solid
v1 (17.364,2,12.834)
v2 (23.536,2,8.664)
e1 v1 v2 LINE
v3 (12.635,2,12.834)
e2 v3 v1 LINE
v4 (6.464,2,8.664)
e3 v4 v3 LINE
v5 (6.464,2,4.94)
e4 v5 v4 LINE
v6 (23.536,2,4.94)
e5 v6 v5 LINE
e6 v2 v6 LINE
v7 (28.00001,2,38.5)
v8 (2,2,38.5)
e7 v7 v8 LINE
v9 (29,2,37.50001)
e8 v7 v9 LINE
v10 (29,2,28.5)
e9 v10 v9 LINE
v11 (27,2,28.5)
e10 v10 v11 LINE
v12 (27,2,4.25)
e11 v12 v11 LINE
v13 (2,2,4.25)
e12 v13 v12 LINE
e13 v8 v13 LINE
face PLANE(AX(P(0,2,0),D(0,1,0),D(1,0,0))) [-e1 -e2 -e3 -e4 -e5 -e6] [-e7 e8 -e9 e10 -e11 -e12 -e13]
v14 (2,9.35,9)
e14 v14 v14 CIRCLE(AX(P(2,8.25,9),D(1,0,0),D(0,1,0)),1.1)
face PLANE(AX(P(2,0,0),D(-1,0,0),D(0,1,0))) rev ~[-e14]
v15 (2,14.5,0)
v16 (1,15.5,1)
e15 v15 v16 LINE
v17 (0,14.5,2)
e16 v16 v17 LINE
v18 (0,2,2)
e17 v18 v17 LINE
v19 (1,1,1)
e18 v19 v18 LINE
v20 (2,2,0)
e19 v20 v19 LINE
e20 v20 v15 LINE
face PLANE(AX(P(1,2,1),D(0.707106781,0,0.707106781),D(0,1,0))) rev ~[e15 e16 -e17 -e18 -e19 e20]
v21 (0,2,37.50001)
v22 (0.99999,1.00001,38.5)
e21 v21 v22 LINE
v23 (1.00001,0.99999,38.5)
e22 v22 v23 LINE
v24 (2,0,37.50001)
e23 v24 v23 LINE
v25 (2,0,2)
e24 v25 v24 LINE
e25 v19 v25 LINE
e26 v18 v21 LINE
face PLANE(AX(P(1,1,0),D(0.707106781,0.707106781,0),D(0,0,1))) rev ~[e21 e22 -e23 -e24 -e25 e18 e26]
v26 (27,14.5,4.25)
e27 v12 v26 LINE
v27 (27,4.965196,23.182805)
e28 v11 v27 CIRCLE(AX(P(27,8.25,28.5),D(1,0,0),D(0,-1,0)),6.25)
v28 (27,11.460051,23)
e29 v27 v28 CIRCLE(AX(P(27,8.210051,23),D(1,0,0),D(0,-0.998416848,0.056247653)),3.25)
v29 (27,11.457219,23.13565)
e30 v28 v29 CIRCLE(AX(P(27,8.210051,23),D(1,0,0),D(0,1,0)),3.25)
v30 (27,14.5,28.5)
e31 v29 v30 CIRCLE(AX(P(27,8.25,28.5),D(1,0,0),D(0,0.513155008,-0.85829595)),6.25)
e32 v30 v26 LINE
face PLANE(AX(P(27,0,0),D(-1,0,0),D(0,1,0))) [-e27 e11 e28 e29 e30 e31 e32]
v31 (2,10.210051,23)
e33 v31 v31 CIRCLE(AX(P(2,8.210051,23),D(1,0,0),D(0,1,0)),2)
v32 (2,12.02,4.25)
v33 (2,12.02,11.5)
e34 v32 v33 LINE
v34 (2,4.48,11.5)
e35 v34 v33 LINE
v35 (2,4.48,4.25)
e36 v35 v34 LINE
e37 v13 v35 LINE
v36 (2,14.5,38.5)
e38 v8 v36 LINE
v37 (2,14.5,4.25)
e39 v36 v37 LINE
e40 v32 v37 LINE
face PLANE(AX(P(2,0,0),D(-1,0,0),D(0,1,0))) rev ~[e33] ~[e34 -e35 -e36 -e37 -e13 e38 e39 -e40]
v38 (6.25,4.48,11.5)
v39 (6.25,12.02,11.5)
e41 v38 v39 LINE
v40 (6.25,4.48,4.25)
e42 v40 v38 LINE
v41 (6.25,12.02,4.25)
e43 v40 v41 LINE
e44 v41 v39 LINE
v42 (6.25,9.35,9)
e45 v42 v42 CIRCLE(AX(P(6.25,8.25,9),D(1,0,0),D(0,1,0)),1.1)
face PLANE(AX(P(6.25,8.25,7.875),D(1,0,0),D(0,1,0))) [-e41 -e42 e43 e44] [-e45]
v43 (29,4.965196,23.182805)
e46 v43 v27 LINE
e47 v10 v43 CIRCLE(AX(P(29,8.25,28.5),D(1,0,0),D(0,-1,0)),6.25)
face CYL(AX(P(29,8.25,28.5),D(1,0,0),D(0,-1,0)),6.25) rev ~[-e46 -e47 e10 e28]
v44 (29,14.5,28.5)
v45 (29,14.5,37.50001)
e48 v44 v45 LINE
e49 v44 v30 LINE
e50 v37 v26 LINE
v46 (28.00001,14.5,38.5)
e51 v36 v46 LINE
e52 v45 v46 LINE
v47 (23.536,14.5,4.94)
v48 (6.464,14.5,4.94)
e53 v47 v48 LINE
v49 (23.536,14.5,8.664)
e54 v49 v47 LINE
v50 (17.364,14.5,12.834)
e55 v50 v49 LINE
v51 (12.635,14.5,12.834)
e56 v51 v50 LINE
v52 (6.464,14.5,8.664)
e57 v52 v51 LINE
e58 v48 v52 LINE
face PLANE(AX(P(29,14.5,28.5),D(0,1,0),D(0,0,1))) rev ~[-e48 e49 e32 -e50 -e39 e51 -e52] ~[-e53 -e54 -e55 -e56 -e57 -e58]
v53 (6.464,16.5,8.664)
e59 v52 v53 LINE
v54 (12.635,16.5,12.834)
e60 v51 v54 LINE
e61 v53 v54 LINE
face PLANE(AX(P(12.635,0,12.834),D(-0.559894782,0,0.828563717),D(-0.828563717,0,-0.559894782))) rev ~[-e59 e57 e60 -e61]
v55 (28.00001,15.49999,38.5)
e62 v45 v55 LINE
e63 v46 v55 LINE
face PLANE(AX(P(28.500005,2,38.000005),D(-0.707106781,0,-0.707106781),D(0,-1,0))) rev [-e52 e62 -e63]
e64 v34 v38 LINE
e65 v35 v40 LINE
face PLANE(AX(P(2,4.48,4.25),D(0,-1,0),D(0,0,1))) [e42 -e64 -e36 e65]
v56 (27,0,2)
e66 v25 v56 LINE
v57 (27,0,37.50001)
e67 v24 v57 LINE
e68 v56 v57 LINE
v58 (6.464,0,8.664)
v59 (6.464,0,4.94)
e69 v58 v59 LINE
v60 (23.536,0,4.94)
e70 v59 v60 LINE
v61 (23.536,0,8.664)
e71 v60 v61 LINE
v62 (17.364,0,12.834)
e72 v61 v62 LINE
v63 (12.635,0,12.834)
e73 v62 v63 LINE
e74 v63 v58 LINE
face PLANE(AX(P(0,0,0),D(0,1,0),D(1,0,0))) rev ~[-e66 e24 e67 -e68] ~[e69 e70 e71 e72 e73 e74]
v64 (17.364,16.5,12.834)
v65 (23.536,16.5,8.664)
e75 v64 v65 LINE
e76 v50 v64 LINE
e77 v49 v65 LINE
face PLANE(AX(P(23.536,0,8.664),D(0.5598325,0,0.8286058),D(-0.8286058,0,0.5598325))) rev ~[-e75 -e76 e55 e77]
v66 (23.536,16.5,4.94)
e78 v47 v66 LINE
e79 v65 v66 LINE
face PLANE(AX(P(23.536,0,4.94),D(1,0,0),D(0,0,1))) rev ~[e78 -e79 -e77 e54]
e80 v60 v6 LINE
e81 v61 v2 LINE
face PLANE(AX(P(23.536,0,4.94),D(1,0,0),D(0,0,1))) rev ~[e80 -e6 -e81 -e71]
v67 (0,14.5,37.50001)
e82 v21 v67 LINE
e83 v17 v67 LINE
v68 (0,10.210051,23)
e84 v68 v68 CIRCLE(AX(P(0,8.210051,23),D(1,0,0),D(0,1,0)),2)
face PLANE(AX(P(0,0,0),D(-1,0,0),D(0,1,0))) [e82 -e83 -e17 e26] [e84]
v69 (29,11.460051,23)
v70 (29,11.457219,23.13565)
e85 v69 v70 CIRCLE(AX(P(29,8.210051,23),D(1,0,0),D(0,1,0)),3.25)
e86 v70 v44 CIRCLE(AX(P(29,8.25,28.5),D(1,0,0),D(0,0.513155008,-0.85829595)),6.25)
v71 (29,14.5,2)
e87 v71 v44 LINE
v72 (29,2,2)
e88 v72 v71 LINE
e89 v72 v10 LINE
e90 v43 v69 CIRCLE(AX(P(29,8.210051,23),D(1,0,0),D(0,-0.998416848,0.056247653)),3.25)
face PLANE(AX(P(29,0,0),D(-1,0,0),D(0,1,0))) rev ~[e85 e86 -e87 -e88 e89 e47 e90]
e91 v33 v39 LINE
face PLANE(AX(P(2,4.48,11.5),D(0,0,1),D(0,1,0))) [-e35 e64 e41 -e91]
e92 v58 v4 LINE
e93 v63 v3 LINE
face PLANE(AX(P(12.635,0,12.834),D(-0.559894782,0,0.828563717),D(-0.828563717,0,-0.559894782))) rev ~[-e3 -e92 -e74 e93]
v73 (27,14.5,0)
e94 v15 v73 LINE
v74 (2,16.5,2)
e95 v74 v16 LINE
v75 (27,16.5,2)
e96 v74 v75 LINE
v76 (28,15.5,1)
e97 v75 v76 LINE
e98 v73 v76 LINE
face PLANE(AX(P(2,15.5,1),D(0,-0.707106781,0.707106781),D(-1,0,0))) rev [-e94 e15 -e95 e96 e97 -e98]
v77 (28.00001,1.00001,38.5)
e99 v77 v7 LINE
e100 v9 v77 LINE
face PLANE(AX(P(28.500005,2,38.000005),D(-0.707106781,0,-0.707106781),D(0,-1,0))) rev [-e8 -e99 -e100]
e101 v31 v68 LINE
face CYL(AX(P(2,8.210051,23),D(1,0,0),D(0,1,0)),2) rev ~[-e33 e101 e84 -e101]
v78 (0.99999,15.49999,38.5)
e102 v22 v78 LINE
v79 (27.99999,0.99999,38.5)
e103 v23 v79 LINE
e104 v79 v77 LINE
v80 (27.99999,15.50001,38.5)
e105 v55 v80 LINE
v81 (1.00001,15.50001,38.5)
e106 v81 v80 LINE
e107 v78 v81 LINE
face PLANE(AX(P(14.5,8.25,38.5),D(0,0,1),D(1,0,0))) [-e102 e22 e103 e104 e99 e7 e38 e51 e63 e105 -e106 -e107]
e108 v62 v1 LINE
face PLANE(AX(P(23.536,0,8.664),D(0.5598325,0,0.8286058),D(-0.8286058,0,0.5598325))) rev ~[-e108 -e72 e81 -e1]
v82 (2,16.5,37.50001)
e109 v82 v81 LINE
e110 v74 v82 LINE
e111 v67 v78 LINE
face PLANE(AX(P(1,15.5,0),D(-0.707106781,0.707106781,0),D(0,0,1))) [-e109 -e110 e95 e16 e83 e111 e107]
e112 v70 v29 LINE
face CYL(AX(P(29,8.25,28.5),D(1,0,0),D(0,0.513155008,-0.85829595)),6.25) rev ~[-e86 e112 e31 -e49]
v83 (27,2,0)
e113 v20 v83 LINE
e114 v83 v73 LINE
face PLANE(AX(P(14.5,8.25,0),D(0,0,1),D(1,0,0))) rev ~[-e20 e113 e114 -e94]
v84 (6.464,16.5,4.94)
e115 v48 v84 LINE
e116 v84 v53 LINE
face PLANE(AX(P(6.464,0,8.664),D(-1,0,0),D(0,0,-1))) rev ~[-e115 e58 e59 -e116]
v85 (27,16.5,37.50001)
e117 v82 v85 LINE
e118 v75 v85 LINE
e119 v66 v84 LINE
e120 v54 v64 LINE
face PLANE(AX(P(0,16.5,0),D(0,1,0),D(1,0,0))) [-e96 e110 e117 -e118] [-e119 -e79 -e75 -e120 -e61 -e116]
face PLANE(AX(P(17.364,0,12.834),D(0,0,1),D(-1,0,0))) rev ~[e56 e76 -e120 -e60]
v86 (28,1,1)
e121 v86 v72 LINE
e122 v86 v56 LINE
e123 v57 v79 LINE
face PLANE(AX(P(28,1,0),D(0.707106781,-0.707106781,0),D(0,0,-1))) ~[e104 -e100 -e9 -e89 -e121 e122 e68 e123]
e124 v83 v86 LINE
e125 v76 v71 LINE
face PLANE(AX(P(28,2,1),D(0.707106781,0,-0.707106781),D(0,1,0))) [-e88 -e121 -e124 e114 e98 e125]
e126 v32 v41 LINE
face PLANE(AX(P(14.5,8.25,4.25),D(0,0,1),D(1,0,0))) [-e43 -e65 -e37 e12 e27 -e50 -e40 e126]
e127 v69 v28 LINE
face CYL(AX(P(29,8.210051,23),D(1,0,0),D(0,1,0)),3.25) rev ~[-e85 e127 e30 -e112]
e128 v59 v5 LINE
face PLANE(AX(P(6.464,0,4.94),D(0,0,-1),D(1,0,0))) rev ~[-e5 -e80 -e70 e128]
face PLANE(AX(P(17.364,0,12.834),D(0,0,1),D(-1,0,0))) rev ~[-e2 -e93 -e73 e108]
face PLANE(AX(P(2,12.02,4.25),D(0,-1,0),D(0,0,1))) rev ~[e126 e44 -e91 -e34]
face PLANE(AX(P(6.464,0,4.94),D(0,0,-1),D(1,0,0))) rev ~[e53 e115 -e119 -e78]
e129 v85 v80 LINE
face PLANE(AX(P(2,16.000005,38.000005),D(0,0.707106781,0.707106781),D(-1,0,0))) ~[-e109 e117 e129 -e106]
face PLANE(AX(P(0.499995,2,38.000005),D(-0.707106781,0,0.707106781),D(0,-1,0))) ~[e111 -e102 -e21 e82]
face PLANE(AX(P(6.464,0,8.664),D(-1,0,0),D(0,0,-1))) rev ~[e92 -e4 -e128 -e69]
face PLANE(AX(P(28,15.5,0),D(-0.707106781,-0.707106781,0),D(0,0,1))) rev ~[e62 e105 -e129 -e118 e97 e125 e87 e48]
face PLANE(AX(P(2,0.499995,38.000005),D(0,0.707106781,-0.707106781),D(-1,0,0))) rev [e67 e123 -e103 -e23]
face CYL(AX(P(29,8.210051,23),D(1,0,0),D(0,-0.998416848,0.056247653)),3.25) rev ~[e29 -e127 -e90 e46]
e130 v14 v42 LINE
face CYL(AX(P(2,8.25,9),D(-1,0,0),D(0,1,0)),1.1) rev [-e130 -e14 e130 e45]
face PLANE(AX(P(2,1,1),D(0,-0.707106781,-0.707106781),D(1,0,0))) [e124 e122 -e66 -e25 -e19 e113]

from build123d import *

# Parameters (mm, degrees)
F0_W      = 29
F0_H      = 16.5
F1_DEPTH  = 38.5
F2_T      = -2
F3_DEPTH  = 2.25
F4_SIZE   = 2
F5_SIZE   = 2
F6_SIZE   = 0.99999
F8_DEPTH  = 16.501
F10_DEPTH = 2
F11_R     = 2
F12_DEPTH = 2.001
F13_W     = 7.54
F13_H     = 7.25
F13_R     = 1.1
F14_DEPTH = 4.25


# Not quite as in the source:
# - a fillet or chamfer is up to 0.001 mm smaller than in the source, because OpenCascade refuses the exact size


with BuildPart() as f1:
    # F0 (on Top) → F1 (new body)
    with BuildSketch(Plane.XY):
        with Locations((14.5, 8.25)):
            Rectangle(F0_W, F0_H)
    extrude(amount=F1_DEPTH)

    # F2
    f2_openings = [f1.faces().sort_by_distance(p)[0] for p in [
        (14.5, 8.25, 38.5),
    ]]
    offset(amount=F2_T, openings=f2_openings)

    # F3 (add): a face of the model
    f3_faces = [f1.faces().sort_by_distance(p)[0] for p in [
        (14.5, 8.25, 2),
    ]]
    extrude(f3_faces, amount=F3_DEPTH)

    # F4
    f4_edges = [f1.edges().sort_by_distance(p)[0] for p in [
        (0, 0, 19.25),
        (0, 16.5, 19.25),
        (29, 16.5, 19.25),
        (29, 0, 19.25),
    ]]
    chamfer(f4_edges, length=F4_SIZE)

    # F5 (call 1 of 4: OpenCascade refuses the feature's edges together)
    f5_edges = [f1.edges().sort_by_distance(p)[0] for p in [
        (14.5, 16.5, 0),
    ]]
    chamfer(f5_edges, length=F5_SIZE)

    # F5#2 (call 2 of 4)
    f5_2_edges = [f1.edges().sort_by_distance(p)[0] for p in [
        (29, 8.25, 0),
    ]]
    chamfer(f5_2_edges, length=F5_SIZE)

    # F5#3 (call 3 of 4)
    f5_3_edges = [f1.edges().sort_by_distance(p)[0] for p in [
        (14.5, 0, 0),
    ]]
    chamfer(f5_3_edges, length=F5_SIZE)

    # F5#4 (call 4 of 4)
    f5_4_edges = [f1.edges().sort_by_distance(p)[0] for p in [
        (0, 8.25, 0),
    ]]
    chamfer(f5_4_edges, length=F5_SIZE)

    # F6 (size 1 in the source; OpenCascade refuses exactly that, so slightly less here)
    f6_edges = [f1.edges().sort_by_distance(p)[0] for p in [
        (14.5, 16.5, 38.5),
        (0, 8.25, 38.5),
        (14.5, 0, 38.5),
        (29, 8.25, 38.5),
    ]]
    chamfer(f6_edges, length=F6_SIZE)

    # F7 (on face) → F8 (cut, through all)
    with BuildSketch(Plane.XZ):
        Polygon((6.464, 8.664), (6.464, 4.94), (23.536, 4.94), (23.536, 8.664), (17.364, 12.834), (12.635, 12.834), align=None)
    extrude(amount=-F8_DEPTH, mode=Mode.SUBTRACT)

    # F9 (on face) → F10 (cut, through all)
    with BuildSketch(Plane.YZ.offset(29)):
        with BuildLine():
            Line((2, 28.5), (14.5, 28.5))
            ThreePointArc((14.5, 28.5), (8.25, 34.75), (2, 28.5))
        make_face()
        with BuildLine():
            ThreePointArc((11.4572188031, 23.1356503144), (13.6863414867, 25.4163834155), (14.5, 28.5))
            Line((14.5, 28.5), (2, 28.5))
            ThreePointArc((2, 28.5), (2.7914047728, 25.4559503707), (4.9651962066, 23.1828048711))
            ThreePointArc((4.9651962066, 23.1828048711), (8.2336565888, 26.2499142718), (11.4572188031, 23.1356503144))
        make_face()
        with BuildLine():
            ThreePointArc((2, 28.5), (8.25, 34.75), (14.5, 28.5))
            Line((14.5, 28.5), (14.5, 38.5))
            Line((14.5, 38.5), (2, 38.5))
            Line((2, 38.5), (2, 28.5))
        make_face()
        with BuildLine():
            ThreePointArc((11.4600509613, 23), (11.4593428446, 23.0678399383), (11.4572188031, 23.1356503144))
            ThreePointArc((11.4572188031, 23.1356503144), (8.2046045626, 22.2501648618), (4.9651962066, 23.1828048711))
            ThreePointArc((4.9651962066, 23.1828048711), (8.1186123283, 19.751286566), (11.4600509613, 23))
        make_face()
        with BuildLine():
            ThreePointArc((4.9651962066, 23.1828048711), (8.2046045626, 22.2501648618), (11.4572188031, 23.1356503144))
            ThreePointArc((11.4572188031, 23.1356503144), (8.2336565888, 26.2499142718), (4.9651962066, 23.1828048711))
        make_face()
    extrude(amount=-F10_DEPTH, mode=Mode.SUBTRACT)

    # F11 (on face) → F12 (cut, through all)
    with BuildSketch(Plane.YZ.offset(2)):
        with Locations((8.2100509613, 23)):
            Circle(F11_R)
    extrude(amount=-F12_DEPTH, mode=Mode.SUBTRACT)

    # F13 (on face) → F14 (join)
    with BuildSketch(Plane.YZ.offset(2)):
        with Locations((8.25, 7.875)):
            Rectangle(F13_W, F13_H)
        with Locations((8.25, 9)):
            Circle(F13_R, mode=Mode.SUBTRACT)
    extrude(amount=F14_DEPTH)


solid = f1.part
